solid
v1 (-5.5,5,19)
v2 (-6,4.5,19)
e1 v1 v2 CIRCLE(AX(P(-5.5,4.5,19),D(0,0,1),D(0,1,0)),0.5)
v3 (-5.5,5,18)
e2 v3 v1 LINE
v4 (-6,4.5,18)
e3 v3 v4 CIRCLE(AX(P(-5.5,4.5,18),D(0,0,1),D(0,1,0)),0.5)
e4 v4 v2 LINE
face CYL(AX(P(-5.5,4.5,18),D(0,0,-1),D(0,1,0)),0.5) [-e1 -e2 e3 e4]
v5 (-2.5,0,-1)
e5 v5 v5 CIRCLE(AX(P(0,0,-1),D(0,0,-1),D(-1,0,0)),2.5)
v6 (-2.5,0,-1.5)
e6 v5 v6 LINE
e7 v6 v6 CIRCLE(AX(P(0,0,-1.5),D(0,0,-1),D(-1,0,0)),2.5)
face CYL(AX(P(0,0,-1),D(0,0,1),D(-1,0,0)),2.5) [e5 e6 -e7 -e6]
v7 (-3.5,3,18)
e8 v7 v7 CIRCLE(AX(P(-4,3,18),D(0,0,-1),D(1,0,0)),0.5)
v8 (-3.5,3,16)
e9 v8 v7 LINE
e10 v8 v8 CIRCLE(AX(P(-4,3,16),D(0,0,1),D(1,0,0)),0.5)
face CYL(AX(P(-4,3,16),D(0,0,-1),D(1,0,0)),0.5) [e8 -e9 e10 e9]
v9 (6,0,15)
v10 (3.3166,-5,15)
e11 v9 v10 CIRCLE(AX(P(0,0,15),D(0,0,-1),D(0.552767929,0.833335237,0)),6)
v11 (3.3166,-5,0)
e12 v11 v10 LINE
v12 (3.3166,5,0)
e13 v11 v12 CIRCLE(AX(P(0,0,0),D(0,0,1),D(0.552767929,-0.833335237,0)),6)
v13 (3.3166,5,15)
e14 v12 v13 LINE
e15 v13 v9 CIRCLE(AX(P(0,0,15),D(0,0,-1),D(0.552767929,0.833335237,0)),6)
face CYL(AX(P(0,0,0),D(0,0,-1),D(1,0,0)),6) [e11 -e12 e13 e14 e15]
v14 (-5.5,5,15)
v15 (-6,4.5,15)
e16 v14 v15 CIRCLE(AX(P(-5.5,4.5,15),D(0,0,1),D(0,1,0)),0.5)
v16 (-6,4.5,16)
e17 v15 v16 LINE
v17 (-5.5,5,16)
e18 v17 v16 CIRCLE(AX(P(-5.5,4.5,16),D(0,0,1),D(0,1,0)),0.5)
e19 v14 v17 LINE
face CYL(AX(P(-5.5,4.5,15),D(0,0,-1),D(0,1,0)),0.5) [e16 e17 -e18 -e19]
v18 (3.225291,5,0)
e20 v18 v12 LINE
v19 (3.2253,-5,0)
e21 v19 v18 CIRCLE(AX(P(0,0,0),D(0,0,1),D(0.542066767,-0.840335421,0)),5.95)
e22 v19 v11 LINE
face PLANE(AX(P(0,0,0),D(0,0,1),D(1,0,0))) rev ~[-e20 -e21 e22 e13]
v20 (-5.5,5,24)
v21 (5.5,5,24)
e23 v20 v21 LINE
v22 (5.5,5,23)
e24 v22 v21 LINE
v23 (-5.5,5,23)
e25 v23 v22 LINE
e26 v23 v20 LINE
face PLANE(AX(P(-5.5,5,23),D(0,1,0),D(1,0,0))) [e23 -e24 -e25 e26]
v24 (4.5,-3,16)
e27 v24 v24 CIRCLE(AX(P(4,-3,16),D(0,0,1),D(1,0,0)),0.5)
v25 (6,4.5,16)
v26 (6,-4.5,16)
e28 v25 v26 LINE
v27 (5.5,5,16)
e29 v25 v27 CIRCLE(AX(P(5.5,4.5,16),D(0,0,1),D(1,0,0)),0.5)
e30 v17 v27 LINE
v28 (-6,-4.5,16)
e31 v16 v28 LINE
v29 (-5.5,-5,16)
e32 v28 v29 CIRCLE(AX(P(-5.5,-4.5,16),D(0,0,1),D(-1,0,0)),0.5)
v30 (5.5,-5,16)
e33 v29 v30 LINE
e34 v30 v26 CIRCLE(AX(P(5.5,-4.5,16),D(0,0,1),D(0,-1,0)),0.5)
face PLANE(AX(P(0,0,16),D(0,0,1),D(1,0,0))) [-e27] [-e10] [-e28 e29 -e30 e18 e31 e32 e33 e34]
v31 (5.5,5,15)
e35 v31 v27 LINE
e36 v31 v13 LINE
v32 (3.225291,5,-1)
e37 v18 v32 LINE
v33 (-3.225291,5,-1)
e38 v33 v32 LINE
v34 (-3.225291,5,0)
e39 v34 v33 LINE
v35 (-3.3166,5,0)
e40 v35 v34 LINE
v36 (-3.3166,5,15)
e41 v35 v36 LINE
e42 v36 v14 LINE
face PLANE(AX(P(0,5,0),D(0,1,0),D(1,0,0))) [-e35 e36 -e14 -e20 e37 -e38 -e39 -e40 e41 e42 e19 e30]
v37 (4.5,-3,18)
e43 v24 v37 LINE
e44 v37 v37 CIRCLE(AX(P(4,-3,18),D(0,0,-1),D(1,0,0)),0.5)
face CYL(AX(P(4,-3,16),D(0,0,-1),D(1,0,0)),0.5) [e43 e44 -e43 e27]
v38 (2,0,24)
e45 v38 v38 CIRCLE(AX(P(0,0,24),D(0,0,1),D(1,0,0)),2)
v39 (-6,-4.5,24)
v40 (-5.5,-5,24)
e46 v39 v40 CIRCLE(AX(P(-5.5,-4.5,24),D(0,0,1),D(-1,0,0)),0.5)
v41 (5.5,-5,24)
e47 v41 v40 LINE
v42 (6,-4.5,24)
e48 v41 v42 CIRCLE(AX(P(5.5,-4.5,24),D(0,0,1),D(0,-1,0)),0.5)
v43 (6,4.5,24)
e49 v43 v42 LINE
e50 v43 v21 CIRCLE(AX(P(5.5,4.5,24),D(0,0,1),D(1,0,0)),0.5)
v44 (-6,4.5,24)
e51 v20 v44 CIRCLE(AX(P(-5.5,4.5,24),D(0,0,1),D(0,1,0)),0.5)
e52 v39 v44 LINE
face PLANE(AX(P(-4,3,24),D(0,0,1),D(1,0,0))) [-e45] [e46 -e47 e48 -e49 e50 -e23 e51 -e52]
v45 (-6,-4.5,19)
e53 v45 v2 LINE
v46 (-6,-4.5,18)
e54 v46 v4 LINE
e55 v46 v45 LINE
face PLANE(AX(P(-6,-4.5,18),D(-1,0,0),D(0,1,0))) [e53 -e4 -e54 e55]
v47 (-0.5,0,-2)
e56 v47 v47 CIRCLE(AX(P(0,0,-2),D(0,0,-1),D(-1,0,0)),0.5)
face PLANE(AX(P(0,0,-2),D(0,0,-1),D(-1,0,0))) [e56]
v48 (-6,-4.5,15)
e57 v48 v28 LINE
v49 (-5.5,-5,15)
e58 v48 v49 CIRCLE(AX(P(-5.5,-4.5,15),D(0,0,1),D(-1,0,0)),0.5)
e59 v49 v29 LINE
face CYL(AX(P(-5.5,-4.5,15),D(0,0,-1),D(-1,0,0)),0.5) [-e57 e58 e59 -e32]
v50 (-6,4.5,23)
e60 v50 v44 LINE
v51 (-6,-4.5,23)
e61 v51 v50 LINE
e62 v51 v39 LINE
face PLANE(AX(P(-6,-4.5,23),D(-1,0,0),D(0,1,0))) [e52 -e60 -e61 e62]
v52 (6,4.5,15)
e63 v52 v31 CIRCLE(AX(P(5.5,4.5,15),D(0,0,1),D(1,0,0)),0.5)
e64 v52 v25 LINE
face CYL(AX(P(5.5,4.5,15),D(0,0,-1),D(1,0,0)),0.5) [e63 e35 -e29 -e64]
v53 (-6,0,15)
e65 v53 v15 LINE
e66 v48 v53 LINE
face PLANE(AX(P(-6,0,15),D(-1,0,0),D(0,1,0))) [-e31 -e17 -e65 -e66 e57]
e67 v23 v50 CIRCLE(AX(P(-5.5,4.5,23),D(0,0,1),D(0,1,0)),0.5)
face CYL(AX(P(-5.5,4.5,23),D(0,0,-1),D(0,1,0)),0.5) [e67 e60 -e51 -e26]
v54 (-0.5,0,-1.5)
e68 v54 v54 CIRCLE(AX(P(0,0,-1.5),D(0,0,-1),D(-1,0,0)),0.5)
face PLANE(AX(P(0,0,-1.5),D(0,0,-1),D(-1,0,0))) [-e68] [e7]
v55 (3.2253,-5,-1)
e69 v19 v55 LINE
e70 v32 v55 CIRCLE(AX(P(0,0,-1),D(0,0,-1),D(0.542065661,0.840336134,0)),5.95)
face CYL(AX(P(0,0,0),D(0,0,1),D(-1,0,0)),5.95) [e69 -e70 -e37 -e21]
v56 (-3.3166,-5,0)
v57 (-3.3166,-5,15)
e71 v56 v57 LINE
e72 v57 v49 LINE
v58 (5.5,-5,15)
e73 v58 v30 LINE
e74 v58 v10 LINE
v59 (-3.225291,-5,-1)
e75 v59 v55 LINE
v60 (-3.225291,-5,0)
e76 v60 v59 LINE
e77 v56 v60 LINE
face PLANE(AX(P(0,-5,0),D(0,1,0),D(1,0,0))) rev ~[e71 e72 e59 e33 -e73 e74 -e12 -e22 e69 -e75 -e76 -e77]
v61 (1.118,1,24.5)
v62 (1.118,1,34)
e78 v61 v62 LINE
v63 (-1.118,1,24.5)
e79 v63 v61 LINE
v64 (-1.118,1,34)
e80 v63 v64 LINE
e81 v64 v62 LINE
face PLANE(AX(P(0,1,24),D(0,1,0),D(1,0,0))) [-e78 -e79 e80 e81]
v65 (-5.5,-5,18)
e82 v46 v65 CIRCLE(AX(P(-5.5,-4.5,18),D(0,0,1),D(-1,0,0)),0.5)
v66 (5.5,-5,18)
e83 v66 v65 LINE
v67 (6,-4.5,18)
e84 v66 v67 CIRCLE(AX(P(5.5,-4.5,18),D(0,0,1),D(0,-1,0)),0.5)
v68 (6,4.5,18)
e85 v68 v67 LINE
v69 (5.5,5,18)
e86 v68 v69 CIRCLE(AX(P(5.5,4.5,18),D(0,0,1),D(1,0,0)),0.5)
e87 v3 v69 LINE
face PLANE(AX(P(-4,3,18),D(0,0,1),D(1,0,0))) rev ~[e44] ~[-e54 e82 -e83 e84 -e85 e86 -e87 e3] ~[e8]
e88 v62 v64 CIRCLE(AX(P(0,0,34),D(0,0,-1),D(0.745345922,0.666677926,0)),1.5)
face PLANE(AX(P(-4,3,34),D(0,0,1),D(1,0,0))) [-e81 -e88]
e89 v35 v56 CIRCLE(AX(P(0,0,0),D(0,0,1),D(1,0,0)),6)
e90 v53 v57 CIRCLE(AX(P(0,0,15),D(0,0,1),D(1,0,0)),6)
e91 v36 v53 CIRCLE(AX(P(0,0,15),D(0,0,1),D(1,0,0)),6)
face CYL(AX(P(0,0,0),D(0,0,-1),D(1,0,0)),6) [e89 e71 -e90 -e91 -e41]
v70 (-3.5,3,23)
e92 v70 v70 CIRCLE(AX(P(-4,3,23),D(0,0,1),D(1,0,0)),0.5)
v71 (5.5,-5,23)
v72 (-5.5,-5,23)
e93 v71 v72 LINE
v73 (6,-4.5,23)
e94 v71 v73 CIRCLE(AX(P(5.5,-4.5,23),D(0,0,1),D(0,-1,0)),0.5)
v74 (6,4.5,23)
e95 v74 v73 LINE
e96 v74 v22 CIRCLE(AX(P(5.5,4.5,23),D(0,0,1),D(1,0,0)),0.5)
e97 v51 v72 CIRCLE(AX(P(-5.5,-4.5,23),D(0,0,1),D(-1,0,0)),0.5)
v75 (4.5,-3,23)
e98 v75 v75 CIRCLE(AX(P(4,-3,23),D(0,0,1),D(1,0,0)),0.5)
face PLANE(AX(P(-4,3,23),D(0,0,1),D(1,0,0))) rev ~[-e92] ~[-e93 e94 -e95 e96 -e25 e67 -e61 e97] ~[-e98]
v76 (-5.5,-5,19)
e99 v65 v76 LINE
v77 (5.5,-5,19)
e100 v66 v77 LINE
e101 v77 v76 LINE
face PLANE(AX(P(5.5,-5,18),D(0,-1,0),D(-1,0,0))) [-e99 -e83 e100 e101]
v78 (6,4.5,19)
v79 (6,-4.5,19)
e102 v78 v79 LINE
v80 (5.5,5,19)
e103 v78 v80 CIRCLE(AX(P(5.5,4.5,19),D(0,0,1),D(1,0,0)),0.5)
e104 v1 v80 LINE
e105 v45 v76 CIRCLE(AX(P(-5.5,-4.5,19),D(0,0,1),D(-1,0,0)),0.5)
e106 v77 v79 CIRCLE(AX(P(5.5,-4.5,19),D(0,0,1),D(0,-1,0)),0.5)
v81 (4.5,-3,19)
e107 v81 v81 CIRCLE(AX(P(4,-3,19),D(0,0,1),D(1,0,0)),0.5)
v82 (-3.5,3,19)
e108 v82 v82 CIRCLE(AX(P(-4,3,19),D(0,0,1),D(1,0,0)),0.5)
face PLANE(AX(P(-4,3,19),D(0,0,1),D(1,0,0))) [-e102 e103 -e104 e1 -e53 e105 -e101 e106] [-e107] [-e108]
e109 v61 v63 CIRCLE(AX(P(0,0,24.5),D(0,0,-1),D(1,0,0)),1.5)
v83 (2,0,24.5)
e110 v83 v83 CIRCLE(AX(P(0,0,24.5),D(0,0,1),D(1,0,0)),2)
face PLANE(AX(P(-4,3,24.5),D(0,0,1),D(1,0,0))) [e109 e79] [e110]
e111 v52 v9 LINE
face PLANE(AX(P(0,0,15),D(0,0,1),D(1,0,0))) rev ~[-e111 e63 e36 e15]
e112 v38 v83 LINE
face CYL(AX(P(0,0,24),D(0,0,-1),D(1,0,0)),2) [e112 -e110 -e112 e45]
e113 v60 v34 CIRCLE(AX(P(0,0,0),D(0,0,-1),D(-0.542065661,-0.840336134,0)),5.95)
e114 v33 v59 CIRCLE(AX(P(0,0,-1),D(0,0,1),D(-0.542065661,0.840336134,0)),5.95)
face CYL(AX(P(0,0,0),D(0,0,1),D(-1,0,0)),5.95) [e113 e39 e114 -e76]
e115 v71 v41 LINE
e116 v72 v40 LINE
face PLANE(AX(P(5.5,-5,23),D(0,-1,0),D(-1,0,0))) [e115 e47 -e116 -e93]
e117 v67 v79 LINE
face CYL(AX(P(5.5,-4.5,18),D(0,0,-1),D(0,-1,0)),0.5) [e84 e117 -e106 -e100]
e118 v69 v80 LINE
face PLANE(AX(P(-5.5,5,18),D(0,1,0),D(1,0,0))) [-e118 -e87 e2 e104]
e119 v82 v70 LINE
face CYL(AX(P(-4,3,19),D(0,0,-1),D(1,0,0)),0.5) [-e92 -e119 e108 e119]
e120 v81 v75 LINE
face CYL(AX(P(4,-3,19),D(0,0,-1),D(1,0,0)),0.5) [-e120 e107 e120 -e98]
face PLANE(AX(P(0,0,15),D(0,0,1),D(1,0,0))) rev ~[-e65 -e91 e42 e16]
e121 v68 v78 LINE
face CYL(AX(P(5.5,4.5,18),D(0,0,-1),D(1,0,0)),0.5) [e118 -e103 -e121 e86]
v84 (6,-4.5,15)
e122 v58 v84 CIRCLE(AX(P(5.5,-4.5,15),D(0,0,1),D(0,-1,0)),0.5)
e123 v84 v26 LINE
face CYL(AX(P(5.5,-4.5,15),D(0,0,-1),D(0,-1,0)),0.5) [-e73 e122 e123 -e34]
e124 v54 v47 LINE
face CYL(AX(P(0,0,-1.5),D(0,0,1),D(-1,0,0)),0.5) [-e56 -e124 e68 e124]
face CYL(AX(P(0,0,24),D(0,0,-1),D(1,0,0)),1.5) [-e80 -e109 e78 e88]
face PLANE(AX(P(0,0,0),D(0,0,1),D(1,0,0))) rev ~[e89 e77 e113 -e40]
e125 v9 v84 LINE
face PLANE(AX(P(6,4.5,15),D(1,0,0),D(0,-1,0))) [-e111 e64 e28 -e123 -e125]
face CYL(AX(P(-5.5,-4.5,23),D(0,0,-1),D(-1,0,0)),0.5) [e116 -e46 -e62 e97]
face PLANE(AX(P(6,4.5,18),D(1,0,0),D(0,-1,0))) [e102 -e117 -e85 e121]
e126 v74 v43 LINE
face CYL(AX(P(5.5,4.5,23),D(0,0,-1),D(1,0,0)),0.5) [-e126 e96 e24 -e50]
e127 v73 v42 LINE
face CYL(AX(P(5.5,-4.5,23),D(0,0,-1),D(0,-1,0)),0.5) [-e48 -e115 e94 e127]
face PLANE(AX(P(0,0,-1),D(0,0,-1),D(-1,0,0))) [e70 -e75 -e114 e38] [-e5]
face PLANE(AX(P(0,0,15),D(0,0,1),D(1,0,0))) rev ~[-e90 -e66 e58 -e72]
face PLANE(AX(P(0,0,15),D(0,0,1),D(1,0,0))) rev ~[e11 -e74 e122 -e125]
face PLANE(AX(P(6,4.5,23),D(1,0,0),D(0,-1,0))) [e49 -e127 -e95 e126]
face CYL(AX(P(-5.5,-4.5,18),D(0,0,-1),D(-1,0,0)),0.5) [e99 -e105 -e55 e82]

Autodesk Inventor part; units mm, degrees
ref_plane "YZ Plane" through (0, 0, 0) normal (1, 0, 0) x (0, 1, 0)
ref_plane "XZ Plane" through (0, 0, 0) normal (0, 1, 0) x (-1, 0, 0)
ref_plane "XY Plane" through (0, 0, 0) normal (0, 0, 1) x (1, 0, 0)
sketch "Sketch1" plane through (0, 0, 0) normal (0, 0, 1) x (1, 0, 0)
  circle A0 centre (0, 0) radius 6
  line L0 (0, 0) -> (0, 5)
  line L1 (0, 5) -> (3.3166, 5)
  line L2 (0, 5) -> (-3.3166, 5)
  line L3 (0, 0) -> (0, -5)
  line L4 (0, -5) -> (3.3166, -5)
  line L5 (0, -5) -> (-3.3166, -5)
  dimension "d0" = 12
  dimension "d1" = 5
  dimension "d2" = 5
extrude "Extrusion1" add sketch "Sketch1" along normal blind 15 contours A0 L4 L3 L0 L1 | L2 L0 L3 L5 A0
sketch "Sketch2" plane through (0, 0, 15) normal (0, 0, 1) x (1, 0, 0)
  arc A0 (-3.3166, 5) -> (-3.3166, -5) centre (0, 0) ccw projected
  line L0 (-6, 0) -> (-6, 4.5)
  line L1 (-5.5, 5) -> (5.5, 5)
  line L2 (6, 4.5) -> (6, -4.5)
  line L3 (5.5, -5) -> (-5.5, -5)
  line L4 (-6, -4.5) -> (-6, 5)
  arc A1 (-5.5, 5) -> (-6, 4.5) centre (-5.5, 4.5) ccw
  arc A2 (-6, -4.5) -> (-5.5, -5) centre (-5.5, -4.5) ccw
  arc A3 (5.5, -5) -> (6, -4.5) centre (5.5, -4.5) ccw
  arc A4 (6, 4.5) -> (5.5, 5) centre (5.5, 4.5) ccw
  point P0 (6, -5)
  point P1 (-6, -5)
  dimension "d5" = 12
  dimension "d6" = 0.5
  dimension "d32" = 10
  dimension "d33" = 5
extrude "Extrusion2" add sketch "Sketch2" along normal blind 1
sketch "Sketch3" plane through (0, 0, 16) normal (0, 0, 1) x (1, 0, 0)
  line L0 (0, 0) -> (-4, 0)
  line L1 (-4, 0) -> (-4, 3)
  line L2 (0, 0) -> (0, -3)
  line L3 (0, -3) -> (4, -3)
  circle A0 centre (-4, 3) radius 0.5
  circle A1 centre (4, -3) radius 0.5
  dimension "d9" = 4
  dimension "d10" = 3
  dimension "d11" = 3
  dimension "d12" = 4
  dimension "d13" = 1
  dimension "d14" = 1
extrude "Extrusion3" add sketch "Sketch3" along normal blind 2
sketch "Sketch4" plane through (-4, 3, 18) normal (0, 0, 1) x (1, 0, 0)
  line L0 (-1.5, 2) -> (9.5, 2)
  line L1 (10, 1.5) -> (10, -7.5)
  line L2 (9.5, -8) -> (-1.5, -8)
  line L3 (-2, -7.5) -> (-2, 1.5)
  arc A0 (-1.5, 2) -> (-2, 1.5) centre (-1.5, 1.5) ccw
  arc A1 (-2, -7.5) -> (-1.5, -8) centre (-1.5, -7.5) ccw
  arc A2 (9.5, -8) -> (10, -7.5) centre (9.5, -7.5) ccw
  arc A3 (10, 1.5) -> (9.5, 2) centre (9.5, 1.5) ccw
  line L4 (-1.5, -8) -> (9.5, -8) projected
  line L5 (-2, 1.5) -> (-2, -7.5) projected
  point P0 (4, -3)
  dimension "d17" = 0.5
  dimension "d36" = 10
  dimension "d37" = 12
  dimension "d38" = 0
  dimension "d39" = 0
extrude "Extrusion4" add sketch "Sketch4" along normal blind 1
sketch "Sketch5" plane through (-4, 3, 19) normal (0, 0, 1) x (1, 0, 0)
  circle A0 centre (0, 0) radius 0.5 projected
  circle A1 centre (0, 0) radius 0.5
  circle A2 centre (8, -6) radius 0.5 projected
  circle A3 centre (8, -6) radius 0.5
  point P0 (4, -3)
  point P1 (7.9, -5.5101)
  point P2 (7.9, -6.4899)
extrude "Extrusion5" add sketch "Sketch5" along normal blind 4
sketch "Sketch6" plane through (-4, 3, 23) normal (0, 0, 1) x (1, 0, 0)
  line L0 (-1.5, 2) -> (9.5, 2)
  line L1 (10, 1.5) -> (10, -7.5)
  line L2 (9.5, -8) -> (-1.5, -8)
  line L3 (-2, -7.5) -> (-2, 1.5)
  arc A0 (-1.5, 2) -> (-2, 1.5) centre (-1.5, 1.5) ccw
  arc A1 (10, 1.5) -> (9.5, 2) centre (9.5, 1.5) ccw
  arc A2 (9.5, -8) -> (10, -7.5) centre (9.5, -7.5) ccw
  arc A3 (-2, -7.5) -> (-1.5, -8) centre (-1.5, -7.5) ccw
  line L4 (-1.5, -8) -> (9.5, -8) projected
  line L5 (-2, 1.5) -> (-2, -7.5) projected
  point P0 (4, -3)
  dimension "d22" = 0.5
  dimension "d40" = 10
  dimension "d41" = 12
  dimension "d42" = 0
  dimension "d43" = 0
extrude "Extrusion6" add sketch "Sketch6" along normal blind 1
sketch "Sketch7" plane through (-4, 3, 24) normal (0, 0, 1) x (1, 0, 0)
  circle A0 centre (4, -3) radius 1.5
  line L0 (4, -3) -> (4, -2)
  line L1 (4, -2) -> (5.118, -2)
  line L2 (4, -2) -> (2.882, -2)
  dimension "d25" = 3
  dimension "d26" = 1
extrude "Extrusion7" add sketch "Sketch7" along normal blind 10 contours A0 L2 L1 picked at (3.9981, -3.6594)
sketch "Sketch8" plane through (0, 0, 0) normal (0, 0, -1) x (-1, 0, 0)
  circle A0 centre (0, 0) radius 5.95
  line L0 (0, 0) -> (0, -5)
  line L1 (3.3166, -5) -> (-3.3166, -5) projected
  line L2 (0, -5) -> (3.3166, -5)
  line L3 (3.3166, -5) -> (-3.2253, -5)
  line L4 (0, 0) -> (0, 5)
  line L5 (-3.3166, 5) -> (3.3166, 5) projected
  line L6 (3.289, 4.9583) -> (-3.289, 4.9583)
  point P0 (-3.2253, -5)
  point P1 (3.2253, -5)
  point P2 (3.2253, 5)
  point P3 (-3.2253, 5)
  dimension "d35" = 11.9
  dimension "d34" = 5
extrude "Extrusion8" add sketch "Sketch8" along normal blind 1 contours A0 L1 L0 L4 L6 | L6 L4 L5 A0 | L6 A0 L5 L4 | L4 L0 L1 A0 L6
sketch "Sketch9" plane through (0, 0, -1) normal (0, 0, -1) x (-1, 0, 0)
  arc A0 (-1.118, 1) -> (1.118, 1) centre (0, 0) ccw projected
  circle A1 centre (0, 0) radius 2.5
  dimension "d44" = 5
extrude "Extrusion9" add sketch "Sketch9" along normal blind 0.5
sketch "Sketch10" plane through (0, 0, -1.5) normal (0, 0, -1) x (-1, 0, 0)
  circle A0 centre (0, 0) radius 0.5
  dimension "d47" = 1
extrude "Extrusion10" add sketch "Sketch10" along normal blind 0.5
sketch "Sketch11" plane through (-4, 3, 24) normal (0, 0, 1) x (1, 0, 0)
  arc A0 (2.882, -2) -> (5.118, -2) centre (4, -3) ccw projected
  circle A1 centre (4, -3) radius 2
  dimension "d50" = 4
extrude "Extrusion11" add sketch "Sketch11" along normal blind 0.5
properties part number "minimotor"
